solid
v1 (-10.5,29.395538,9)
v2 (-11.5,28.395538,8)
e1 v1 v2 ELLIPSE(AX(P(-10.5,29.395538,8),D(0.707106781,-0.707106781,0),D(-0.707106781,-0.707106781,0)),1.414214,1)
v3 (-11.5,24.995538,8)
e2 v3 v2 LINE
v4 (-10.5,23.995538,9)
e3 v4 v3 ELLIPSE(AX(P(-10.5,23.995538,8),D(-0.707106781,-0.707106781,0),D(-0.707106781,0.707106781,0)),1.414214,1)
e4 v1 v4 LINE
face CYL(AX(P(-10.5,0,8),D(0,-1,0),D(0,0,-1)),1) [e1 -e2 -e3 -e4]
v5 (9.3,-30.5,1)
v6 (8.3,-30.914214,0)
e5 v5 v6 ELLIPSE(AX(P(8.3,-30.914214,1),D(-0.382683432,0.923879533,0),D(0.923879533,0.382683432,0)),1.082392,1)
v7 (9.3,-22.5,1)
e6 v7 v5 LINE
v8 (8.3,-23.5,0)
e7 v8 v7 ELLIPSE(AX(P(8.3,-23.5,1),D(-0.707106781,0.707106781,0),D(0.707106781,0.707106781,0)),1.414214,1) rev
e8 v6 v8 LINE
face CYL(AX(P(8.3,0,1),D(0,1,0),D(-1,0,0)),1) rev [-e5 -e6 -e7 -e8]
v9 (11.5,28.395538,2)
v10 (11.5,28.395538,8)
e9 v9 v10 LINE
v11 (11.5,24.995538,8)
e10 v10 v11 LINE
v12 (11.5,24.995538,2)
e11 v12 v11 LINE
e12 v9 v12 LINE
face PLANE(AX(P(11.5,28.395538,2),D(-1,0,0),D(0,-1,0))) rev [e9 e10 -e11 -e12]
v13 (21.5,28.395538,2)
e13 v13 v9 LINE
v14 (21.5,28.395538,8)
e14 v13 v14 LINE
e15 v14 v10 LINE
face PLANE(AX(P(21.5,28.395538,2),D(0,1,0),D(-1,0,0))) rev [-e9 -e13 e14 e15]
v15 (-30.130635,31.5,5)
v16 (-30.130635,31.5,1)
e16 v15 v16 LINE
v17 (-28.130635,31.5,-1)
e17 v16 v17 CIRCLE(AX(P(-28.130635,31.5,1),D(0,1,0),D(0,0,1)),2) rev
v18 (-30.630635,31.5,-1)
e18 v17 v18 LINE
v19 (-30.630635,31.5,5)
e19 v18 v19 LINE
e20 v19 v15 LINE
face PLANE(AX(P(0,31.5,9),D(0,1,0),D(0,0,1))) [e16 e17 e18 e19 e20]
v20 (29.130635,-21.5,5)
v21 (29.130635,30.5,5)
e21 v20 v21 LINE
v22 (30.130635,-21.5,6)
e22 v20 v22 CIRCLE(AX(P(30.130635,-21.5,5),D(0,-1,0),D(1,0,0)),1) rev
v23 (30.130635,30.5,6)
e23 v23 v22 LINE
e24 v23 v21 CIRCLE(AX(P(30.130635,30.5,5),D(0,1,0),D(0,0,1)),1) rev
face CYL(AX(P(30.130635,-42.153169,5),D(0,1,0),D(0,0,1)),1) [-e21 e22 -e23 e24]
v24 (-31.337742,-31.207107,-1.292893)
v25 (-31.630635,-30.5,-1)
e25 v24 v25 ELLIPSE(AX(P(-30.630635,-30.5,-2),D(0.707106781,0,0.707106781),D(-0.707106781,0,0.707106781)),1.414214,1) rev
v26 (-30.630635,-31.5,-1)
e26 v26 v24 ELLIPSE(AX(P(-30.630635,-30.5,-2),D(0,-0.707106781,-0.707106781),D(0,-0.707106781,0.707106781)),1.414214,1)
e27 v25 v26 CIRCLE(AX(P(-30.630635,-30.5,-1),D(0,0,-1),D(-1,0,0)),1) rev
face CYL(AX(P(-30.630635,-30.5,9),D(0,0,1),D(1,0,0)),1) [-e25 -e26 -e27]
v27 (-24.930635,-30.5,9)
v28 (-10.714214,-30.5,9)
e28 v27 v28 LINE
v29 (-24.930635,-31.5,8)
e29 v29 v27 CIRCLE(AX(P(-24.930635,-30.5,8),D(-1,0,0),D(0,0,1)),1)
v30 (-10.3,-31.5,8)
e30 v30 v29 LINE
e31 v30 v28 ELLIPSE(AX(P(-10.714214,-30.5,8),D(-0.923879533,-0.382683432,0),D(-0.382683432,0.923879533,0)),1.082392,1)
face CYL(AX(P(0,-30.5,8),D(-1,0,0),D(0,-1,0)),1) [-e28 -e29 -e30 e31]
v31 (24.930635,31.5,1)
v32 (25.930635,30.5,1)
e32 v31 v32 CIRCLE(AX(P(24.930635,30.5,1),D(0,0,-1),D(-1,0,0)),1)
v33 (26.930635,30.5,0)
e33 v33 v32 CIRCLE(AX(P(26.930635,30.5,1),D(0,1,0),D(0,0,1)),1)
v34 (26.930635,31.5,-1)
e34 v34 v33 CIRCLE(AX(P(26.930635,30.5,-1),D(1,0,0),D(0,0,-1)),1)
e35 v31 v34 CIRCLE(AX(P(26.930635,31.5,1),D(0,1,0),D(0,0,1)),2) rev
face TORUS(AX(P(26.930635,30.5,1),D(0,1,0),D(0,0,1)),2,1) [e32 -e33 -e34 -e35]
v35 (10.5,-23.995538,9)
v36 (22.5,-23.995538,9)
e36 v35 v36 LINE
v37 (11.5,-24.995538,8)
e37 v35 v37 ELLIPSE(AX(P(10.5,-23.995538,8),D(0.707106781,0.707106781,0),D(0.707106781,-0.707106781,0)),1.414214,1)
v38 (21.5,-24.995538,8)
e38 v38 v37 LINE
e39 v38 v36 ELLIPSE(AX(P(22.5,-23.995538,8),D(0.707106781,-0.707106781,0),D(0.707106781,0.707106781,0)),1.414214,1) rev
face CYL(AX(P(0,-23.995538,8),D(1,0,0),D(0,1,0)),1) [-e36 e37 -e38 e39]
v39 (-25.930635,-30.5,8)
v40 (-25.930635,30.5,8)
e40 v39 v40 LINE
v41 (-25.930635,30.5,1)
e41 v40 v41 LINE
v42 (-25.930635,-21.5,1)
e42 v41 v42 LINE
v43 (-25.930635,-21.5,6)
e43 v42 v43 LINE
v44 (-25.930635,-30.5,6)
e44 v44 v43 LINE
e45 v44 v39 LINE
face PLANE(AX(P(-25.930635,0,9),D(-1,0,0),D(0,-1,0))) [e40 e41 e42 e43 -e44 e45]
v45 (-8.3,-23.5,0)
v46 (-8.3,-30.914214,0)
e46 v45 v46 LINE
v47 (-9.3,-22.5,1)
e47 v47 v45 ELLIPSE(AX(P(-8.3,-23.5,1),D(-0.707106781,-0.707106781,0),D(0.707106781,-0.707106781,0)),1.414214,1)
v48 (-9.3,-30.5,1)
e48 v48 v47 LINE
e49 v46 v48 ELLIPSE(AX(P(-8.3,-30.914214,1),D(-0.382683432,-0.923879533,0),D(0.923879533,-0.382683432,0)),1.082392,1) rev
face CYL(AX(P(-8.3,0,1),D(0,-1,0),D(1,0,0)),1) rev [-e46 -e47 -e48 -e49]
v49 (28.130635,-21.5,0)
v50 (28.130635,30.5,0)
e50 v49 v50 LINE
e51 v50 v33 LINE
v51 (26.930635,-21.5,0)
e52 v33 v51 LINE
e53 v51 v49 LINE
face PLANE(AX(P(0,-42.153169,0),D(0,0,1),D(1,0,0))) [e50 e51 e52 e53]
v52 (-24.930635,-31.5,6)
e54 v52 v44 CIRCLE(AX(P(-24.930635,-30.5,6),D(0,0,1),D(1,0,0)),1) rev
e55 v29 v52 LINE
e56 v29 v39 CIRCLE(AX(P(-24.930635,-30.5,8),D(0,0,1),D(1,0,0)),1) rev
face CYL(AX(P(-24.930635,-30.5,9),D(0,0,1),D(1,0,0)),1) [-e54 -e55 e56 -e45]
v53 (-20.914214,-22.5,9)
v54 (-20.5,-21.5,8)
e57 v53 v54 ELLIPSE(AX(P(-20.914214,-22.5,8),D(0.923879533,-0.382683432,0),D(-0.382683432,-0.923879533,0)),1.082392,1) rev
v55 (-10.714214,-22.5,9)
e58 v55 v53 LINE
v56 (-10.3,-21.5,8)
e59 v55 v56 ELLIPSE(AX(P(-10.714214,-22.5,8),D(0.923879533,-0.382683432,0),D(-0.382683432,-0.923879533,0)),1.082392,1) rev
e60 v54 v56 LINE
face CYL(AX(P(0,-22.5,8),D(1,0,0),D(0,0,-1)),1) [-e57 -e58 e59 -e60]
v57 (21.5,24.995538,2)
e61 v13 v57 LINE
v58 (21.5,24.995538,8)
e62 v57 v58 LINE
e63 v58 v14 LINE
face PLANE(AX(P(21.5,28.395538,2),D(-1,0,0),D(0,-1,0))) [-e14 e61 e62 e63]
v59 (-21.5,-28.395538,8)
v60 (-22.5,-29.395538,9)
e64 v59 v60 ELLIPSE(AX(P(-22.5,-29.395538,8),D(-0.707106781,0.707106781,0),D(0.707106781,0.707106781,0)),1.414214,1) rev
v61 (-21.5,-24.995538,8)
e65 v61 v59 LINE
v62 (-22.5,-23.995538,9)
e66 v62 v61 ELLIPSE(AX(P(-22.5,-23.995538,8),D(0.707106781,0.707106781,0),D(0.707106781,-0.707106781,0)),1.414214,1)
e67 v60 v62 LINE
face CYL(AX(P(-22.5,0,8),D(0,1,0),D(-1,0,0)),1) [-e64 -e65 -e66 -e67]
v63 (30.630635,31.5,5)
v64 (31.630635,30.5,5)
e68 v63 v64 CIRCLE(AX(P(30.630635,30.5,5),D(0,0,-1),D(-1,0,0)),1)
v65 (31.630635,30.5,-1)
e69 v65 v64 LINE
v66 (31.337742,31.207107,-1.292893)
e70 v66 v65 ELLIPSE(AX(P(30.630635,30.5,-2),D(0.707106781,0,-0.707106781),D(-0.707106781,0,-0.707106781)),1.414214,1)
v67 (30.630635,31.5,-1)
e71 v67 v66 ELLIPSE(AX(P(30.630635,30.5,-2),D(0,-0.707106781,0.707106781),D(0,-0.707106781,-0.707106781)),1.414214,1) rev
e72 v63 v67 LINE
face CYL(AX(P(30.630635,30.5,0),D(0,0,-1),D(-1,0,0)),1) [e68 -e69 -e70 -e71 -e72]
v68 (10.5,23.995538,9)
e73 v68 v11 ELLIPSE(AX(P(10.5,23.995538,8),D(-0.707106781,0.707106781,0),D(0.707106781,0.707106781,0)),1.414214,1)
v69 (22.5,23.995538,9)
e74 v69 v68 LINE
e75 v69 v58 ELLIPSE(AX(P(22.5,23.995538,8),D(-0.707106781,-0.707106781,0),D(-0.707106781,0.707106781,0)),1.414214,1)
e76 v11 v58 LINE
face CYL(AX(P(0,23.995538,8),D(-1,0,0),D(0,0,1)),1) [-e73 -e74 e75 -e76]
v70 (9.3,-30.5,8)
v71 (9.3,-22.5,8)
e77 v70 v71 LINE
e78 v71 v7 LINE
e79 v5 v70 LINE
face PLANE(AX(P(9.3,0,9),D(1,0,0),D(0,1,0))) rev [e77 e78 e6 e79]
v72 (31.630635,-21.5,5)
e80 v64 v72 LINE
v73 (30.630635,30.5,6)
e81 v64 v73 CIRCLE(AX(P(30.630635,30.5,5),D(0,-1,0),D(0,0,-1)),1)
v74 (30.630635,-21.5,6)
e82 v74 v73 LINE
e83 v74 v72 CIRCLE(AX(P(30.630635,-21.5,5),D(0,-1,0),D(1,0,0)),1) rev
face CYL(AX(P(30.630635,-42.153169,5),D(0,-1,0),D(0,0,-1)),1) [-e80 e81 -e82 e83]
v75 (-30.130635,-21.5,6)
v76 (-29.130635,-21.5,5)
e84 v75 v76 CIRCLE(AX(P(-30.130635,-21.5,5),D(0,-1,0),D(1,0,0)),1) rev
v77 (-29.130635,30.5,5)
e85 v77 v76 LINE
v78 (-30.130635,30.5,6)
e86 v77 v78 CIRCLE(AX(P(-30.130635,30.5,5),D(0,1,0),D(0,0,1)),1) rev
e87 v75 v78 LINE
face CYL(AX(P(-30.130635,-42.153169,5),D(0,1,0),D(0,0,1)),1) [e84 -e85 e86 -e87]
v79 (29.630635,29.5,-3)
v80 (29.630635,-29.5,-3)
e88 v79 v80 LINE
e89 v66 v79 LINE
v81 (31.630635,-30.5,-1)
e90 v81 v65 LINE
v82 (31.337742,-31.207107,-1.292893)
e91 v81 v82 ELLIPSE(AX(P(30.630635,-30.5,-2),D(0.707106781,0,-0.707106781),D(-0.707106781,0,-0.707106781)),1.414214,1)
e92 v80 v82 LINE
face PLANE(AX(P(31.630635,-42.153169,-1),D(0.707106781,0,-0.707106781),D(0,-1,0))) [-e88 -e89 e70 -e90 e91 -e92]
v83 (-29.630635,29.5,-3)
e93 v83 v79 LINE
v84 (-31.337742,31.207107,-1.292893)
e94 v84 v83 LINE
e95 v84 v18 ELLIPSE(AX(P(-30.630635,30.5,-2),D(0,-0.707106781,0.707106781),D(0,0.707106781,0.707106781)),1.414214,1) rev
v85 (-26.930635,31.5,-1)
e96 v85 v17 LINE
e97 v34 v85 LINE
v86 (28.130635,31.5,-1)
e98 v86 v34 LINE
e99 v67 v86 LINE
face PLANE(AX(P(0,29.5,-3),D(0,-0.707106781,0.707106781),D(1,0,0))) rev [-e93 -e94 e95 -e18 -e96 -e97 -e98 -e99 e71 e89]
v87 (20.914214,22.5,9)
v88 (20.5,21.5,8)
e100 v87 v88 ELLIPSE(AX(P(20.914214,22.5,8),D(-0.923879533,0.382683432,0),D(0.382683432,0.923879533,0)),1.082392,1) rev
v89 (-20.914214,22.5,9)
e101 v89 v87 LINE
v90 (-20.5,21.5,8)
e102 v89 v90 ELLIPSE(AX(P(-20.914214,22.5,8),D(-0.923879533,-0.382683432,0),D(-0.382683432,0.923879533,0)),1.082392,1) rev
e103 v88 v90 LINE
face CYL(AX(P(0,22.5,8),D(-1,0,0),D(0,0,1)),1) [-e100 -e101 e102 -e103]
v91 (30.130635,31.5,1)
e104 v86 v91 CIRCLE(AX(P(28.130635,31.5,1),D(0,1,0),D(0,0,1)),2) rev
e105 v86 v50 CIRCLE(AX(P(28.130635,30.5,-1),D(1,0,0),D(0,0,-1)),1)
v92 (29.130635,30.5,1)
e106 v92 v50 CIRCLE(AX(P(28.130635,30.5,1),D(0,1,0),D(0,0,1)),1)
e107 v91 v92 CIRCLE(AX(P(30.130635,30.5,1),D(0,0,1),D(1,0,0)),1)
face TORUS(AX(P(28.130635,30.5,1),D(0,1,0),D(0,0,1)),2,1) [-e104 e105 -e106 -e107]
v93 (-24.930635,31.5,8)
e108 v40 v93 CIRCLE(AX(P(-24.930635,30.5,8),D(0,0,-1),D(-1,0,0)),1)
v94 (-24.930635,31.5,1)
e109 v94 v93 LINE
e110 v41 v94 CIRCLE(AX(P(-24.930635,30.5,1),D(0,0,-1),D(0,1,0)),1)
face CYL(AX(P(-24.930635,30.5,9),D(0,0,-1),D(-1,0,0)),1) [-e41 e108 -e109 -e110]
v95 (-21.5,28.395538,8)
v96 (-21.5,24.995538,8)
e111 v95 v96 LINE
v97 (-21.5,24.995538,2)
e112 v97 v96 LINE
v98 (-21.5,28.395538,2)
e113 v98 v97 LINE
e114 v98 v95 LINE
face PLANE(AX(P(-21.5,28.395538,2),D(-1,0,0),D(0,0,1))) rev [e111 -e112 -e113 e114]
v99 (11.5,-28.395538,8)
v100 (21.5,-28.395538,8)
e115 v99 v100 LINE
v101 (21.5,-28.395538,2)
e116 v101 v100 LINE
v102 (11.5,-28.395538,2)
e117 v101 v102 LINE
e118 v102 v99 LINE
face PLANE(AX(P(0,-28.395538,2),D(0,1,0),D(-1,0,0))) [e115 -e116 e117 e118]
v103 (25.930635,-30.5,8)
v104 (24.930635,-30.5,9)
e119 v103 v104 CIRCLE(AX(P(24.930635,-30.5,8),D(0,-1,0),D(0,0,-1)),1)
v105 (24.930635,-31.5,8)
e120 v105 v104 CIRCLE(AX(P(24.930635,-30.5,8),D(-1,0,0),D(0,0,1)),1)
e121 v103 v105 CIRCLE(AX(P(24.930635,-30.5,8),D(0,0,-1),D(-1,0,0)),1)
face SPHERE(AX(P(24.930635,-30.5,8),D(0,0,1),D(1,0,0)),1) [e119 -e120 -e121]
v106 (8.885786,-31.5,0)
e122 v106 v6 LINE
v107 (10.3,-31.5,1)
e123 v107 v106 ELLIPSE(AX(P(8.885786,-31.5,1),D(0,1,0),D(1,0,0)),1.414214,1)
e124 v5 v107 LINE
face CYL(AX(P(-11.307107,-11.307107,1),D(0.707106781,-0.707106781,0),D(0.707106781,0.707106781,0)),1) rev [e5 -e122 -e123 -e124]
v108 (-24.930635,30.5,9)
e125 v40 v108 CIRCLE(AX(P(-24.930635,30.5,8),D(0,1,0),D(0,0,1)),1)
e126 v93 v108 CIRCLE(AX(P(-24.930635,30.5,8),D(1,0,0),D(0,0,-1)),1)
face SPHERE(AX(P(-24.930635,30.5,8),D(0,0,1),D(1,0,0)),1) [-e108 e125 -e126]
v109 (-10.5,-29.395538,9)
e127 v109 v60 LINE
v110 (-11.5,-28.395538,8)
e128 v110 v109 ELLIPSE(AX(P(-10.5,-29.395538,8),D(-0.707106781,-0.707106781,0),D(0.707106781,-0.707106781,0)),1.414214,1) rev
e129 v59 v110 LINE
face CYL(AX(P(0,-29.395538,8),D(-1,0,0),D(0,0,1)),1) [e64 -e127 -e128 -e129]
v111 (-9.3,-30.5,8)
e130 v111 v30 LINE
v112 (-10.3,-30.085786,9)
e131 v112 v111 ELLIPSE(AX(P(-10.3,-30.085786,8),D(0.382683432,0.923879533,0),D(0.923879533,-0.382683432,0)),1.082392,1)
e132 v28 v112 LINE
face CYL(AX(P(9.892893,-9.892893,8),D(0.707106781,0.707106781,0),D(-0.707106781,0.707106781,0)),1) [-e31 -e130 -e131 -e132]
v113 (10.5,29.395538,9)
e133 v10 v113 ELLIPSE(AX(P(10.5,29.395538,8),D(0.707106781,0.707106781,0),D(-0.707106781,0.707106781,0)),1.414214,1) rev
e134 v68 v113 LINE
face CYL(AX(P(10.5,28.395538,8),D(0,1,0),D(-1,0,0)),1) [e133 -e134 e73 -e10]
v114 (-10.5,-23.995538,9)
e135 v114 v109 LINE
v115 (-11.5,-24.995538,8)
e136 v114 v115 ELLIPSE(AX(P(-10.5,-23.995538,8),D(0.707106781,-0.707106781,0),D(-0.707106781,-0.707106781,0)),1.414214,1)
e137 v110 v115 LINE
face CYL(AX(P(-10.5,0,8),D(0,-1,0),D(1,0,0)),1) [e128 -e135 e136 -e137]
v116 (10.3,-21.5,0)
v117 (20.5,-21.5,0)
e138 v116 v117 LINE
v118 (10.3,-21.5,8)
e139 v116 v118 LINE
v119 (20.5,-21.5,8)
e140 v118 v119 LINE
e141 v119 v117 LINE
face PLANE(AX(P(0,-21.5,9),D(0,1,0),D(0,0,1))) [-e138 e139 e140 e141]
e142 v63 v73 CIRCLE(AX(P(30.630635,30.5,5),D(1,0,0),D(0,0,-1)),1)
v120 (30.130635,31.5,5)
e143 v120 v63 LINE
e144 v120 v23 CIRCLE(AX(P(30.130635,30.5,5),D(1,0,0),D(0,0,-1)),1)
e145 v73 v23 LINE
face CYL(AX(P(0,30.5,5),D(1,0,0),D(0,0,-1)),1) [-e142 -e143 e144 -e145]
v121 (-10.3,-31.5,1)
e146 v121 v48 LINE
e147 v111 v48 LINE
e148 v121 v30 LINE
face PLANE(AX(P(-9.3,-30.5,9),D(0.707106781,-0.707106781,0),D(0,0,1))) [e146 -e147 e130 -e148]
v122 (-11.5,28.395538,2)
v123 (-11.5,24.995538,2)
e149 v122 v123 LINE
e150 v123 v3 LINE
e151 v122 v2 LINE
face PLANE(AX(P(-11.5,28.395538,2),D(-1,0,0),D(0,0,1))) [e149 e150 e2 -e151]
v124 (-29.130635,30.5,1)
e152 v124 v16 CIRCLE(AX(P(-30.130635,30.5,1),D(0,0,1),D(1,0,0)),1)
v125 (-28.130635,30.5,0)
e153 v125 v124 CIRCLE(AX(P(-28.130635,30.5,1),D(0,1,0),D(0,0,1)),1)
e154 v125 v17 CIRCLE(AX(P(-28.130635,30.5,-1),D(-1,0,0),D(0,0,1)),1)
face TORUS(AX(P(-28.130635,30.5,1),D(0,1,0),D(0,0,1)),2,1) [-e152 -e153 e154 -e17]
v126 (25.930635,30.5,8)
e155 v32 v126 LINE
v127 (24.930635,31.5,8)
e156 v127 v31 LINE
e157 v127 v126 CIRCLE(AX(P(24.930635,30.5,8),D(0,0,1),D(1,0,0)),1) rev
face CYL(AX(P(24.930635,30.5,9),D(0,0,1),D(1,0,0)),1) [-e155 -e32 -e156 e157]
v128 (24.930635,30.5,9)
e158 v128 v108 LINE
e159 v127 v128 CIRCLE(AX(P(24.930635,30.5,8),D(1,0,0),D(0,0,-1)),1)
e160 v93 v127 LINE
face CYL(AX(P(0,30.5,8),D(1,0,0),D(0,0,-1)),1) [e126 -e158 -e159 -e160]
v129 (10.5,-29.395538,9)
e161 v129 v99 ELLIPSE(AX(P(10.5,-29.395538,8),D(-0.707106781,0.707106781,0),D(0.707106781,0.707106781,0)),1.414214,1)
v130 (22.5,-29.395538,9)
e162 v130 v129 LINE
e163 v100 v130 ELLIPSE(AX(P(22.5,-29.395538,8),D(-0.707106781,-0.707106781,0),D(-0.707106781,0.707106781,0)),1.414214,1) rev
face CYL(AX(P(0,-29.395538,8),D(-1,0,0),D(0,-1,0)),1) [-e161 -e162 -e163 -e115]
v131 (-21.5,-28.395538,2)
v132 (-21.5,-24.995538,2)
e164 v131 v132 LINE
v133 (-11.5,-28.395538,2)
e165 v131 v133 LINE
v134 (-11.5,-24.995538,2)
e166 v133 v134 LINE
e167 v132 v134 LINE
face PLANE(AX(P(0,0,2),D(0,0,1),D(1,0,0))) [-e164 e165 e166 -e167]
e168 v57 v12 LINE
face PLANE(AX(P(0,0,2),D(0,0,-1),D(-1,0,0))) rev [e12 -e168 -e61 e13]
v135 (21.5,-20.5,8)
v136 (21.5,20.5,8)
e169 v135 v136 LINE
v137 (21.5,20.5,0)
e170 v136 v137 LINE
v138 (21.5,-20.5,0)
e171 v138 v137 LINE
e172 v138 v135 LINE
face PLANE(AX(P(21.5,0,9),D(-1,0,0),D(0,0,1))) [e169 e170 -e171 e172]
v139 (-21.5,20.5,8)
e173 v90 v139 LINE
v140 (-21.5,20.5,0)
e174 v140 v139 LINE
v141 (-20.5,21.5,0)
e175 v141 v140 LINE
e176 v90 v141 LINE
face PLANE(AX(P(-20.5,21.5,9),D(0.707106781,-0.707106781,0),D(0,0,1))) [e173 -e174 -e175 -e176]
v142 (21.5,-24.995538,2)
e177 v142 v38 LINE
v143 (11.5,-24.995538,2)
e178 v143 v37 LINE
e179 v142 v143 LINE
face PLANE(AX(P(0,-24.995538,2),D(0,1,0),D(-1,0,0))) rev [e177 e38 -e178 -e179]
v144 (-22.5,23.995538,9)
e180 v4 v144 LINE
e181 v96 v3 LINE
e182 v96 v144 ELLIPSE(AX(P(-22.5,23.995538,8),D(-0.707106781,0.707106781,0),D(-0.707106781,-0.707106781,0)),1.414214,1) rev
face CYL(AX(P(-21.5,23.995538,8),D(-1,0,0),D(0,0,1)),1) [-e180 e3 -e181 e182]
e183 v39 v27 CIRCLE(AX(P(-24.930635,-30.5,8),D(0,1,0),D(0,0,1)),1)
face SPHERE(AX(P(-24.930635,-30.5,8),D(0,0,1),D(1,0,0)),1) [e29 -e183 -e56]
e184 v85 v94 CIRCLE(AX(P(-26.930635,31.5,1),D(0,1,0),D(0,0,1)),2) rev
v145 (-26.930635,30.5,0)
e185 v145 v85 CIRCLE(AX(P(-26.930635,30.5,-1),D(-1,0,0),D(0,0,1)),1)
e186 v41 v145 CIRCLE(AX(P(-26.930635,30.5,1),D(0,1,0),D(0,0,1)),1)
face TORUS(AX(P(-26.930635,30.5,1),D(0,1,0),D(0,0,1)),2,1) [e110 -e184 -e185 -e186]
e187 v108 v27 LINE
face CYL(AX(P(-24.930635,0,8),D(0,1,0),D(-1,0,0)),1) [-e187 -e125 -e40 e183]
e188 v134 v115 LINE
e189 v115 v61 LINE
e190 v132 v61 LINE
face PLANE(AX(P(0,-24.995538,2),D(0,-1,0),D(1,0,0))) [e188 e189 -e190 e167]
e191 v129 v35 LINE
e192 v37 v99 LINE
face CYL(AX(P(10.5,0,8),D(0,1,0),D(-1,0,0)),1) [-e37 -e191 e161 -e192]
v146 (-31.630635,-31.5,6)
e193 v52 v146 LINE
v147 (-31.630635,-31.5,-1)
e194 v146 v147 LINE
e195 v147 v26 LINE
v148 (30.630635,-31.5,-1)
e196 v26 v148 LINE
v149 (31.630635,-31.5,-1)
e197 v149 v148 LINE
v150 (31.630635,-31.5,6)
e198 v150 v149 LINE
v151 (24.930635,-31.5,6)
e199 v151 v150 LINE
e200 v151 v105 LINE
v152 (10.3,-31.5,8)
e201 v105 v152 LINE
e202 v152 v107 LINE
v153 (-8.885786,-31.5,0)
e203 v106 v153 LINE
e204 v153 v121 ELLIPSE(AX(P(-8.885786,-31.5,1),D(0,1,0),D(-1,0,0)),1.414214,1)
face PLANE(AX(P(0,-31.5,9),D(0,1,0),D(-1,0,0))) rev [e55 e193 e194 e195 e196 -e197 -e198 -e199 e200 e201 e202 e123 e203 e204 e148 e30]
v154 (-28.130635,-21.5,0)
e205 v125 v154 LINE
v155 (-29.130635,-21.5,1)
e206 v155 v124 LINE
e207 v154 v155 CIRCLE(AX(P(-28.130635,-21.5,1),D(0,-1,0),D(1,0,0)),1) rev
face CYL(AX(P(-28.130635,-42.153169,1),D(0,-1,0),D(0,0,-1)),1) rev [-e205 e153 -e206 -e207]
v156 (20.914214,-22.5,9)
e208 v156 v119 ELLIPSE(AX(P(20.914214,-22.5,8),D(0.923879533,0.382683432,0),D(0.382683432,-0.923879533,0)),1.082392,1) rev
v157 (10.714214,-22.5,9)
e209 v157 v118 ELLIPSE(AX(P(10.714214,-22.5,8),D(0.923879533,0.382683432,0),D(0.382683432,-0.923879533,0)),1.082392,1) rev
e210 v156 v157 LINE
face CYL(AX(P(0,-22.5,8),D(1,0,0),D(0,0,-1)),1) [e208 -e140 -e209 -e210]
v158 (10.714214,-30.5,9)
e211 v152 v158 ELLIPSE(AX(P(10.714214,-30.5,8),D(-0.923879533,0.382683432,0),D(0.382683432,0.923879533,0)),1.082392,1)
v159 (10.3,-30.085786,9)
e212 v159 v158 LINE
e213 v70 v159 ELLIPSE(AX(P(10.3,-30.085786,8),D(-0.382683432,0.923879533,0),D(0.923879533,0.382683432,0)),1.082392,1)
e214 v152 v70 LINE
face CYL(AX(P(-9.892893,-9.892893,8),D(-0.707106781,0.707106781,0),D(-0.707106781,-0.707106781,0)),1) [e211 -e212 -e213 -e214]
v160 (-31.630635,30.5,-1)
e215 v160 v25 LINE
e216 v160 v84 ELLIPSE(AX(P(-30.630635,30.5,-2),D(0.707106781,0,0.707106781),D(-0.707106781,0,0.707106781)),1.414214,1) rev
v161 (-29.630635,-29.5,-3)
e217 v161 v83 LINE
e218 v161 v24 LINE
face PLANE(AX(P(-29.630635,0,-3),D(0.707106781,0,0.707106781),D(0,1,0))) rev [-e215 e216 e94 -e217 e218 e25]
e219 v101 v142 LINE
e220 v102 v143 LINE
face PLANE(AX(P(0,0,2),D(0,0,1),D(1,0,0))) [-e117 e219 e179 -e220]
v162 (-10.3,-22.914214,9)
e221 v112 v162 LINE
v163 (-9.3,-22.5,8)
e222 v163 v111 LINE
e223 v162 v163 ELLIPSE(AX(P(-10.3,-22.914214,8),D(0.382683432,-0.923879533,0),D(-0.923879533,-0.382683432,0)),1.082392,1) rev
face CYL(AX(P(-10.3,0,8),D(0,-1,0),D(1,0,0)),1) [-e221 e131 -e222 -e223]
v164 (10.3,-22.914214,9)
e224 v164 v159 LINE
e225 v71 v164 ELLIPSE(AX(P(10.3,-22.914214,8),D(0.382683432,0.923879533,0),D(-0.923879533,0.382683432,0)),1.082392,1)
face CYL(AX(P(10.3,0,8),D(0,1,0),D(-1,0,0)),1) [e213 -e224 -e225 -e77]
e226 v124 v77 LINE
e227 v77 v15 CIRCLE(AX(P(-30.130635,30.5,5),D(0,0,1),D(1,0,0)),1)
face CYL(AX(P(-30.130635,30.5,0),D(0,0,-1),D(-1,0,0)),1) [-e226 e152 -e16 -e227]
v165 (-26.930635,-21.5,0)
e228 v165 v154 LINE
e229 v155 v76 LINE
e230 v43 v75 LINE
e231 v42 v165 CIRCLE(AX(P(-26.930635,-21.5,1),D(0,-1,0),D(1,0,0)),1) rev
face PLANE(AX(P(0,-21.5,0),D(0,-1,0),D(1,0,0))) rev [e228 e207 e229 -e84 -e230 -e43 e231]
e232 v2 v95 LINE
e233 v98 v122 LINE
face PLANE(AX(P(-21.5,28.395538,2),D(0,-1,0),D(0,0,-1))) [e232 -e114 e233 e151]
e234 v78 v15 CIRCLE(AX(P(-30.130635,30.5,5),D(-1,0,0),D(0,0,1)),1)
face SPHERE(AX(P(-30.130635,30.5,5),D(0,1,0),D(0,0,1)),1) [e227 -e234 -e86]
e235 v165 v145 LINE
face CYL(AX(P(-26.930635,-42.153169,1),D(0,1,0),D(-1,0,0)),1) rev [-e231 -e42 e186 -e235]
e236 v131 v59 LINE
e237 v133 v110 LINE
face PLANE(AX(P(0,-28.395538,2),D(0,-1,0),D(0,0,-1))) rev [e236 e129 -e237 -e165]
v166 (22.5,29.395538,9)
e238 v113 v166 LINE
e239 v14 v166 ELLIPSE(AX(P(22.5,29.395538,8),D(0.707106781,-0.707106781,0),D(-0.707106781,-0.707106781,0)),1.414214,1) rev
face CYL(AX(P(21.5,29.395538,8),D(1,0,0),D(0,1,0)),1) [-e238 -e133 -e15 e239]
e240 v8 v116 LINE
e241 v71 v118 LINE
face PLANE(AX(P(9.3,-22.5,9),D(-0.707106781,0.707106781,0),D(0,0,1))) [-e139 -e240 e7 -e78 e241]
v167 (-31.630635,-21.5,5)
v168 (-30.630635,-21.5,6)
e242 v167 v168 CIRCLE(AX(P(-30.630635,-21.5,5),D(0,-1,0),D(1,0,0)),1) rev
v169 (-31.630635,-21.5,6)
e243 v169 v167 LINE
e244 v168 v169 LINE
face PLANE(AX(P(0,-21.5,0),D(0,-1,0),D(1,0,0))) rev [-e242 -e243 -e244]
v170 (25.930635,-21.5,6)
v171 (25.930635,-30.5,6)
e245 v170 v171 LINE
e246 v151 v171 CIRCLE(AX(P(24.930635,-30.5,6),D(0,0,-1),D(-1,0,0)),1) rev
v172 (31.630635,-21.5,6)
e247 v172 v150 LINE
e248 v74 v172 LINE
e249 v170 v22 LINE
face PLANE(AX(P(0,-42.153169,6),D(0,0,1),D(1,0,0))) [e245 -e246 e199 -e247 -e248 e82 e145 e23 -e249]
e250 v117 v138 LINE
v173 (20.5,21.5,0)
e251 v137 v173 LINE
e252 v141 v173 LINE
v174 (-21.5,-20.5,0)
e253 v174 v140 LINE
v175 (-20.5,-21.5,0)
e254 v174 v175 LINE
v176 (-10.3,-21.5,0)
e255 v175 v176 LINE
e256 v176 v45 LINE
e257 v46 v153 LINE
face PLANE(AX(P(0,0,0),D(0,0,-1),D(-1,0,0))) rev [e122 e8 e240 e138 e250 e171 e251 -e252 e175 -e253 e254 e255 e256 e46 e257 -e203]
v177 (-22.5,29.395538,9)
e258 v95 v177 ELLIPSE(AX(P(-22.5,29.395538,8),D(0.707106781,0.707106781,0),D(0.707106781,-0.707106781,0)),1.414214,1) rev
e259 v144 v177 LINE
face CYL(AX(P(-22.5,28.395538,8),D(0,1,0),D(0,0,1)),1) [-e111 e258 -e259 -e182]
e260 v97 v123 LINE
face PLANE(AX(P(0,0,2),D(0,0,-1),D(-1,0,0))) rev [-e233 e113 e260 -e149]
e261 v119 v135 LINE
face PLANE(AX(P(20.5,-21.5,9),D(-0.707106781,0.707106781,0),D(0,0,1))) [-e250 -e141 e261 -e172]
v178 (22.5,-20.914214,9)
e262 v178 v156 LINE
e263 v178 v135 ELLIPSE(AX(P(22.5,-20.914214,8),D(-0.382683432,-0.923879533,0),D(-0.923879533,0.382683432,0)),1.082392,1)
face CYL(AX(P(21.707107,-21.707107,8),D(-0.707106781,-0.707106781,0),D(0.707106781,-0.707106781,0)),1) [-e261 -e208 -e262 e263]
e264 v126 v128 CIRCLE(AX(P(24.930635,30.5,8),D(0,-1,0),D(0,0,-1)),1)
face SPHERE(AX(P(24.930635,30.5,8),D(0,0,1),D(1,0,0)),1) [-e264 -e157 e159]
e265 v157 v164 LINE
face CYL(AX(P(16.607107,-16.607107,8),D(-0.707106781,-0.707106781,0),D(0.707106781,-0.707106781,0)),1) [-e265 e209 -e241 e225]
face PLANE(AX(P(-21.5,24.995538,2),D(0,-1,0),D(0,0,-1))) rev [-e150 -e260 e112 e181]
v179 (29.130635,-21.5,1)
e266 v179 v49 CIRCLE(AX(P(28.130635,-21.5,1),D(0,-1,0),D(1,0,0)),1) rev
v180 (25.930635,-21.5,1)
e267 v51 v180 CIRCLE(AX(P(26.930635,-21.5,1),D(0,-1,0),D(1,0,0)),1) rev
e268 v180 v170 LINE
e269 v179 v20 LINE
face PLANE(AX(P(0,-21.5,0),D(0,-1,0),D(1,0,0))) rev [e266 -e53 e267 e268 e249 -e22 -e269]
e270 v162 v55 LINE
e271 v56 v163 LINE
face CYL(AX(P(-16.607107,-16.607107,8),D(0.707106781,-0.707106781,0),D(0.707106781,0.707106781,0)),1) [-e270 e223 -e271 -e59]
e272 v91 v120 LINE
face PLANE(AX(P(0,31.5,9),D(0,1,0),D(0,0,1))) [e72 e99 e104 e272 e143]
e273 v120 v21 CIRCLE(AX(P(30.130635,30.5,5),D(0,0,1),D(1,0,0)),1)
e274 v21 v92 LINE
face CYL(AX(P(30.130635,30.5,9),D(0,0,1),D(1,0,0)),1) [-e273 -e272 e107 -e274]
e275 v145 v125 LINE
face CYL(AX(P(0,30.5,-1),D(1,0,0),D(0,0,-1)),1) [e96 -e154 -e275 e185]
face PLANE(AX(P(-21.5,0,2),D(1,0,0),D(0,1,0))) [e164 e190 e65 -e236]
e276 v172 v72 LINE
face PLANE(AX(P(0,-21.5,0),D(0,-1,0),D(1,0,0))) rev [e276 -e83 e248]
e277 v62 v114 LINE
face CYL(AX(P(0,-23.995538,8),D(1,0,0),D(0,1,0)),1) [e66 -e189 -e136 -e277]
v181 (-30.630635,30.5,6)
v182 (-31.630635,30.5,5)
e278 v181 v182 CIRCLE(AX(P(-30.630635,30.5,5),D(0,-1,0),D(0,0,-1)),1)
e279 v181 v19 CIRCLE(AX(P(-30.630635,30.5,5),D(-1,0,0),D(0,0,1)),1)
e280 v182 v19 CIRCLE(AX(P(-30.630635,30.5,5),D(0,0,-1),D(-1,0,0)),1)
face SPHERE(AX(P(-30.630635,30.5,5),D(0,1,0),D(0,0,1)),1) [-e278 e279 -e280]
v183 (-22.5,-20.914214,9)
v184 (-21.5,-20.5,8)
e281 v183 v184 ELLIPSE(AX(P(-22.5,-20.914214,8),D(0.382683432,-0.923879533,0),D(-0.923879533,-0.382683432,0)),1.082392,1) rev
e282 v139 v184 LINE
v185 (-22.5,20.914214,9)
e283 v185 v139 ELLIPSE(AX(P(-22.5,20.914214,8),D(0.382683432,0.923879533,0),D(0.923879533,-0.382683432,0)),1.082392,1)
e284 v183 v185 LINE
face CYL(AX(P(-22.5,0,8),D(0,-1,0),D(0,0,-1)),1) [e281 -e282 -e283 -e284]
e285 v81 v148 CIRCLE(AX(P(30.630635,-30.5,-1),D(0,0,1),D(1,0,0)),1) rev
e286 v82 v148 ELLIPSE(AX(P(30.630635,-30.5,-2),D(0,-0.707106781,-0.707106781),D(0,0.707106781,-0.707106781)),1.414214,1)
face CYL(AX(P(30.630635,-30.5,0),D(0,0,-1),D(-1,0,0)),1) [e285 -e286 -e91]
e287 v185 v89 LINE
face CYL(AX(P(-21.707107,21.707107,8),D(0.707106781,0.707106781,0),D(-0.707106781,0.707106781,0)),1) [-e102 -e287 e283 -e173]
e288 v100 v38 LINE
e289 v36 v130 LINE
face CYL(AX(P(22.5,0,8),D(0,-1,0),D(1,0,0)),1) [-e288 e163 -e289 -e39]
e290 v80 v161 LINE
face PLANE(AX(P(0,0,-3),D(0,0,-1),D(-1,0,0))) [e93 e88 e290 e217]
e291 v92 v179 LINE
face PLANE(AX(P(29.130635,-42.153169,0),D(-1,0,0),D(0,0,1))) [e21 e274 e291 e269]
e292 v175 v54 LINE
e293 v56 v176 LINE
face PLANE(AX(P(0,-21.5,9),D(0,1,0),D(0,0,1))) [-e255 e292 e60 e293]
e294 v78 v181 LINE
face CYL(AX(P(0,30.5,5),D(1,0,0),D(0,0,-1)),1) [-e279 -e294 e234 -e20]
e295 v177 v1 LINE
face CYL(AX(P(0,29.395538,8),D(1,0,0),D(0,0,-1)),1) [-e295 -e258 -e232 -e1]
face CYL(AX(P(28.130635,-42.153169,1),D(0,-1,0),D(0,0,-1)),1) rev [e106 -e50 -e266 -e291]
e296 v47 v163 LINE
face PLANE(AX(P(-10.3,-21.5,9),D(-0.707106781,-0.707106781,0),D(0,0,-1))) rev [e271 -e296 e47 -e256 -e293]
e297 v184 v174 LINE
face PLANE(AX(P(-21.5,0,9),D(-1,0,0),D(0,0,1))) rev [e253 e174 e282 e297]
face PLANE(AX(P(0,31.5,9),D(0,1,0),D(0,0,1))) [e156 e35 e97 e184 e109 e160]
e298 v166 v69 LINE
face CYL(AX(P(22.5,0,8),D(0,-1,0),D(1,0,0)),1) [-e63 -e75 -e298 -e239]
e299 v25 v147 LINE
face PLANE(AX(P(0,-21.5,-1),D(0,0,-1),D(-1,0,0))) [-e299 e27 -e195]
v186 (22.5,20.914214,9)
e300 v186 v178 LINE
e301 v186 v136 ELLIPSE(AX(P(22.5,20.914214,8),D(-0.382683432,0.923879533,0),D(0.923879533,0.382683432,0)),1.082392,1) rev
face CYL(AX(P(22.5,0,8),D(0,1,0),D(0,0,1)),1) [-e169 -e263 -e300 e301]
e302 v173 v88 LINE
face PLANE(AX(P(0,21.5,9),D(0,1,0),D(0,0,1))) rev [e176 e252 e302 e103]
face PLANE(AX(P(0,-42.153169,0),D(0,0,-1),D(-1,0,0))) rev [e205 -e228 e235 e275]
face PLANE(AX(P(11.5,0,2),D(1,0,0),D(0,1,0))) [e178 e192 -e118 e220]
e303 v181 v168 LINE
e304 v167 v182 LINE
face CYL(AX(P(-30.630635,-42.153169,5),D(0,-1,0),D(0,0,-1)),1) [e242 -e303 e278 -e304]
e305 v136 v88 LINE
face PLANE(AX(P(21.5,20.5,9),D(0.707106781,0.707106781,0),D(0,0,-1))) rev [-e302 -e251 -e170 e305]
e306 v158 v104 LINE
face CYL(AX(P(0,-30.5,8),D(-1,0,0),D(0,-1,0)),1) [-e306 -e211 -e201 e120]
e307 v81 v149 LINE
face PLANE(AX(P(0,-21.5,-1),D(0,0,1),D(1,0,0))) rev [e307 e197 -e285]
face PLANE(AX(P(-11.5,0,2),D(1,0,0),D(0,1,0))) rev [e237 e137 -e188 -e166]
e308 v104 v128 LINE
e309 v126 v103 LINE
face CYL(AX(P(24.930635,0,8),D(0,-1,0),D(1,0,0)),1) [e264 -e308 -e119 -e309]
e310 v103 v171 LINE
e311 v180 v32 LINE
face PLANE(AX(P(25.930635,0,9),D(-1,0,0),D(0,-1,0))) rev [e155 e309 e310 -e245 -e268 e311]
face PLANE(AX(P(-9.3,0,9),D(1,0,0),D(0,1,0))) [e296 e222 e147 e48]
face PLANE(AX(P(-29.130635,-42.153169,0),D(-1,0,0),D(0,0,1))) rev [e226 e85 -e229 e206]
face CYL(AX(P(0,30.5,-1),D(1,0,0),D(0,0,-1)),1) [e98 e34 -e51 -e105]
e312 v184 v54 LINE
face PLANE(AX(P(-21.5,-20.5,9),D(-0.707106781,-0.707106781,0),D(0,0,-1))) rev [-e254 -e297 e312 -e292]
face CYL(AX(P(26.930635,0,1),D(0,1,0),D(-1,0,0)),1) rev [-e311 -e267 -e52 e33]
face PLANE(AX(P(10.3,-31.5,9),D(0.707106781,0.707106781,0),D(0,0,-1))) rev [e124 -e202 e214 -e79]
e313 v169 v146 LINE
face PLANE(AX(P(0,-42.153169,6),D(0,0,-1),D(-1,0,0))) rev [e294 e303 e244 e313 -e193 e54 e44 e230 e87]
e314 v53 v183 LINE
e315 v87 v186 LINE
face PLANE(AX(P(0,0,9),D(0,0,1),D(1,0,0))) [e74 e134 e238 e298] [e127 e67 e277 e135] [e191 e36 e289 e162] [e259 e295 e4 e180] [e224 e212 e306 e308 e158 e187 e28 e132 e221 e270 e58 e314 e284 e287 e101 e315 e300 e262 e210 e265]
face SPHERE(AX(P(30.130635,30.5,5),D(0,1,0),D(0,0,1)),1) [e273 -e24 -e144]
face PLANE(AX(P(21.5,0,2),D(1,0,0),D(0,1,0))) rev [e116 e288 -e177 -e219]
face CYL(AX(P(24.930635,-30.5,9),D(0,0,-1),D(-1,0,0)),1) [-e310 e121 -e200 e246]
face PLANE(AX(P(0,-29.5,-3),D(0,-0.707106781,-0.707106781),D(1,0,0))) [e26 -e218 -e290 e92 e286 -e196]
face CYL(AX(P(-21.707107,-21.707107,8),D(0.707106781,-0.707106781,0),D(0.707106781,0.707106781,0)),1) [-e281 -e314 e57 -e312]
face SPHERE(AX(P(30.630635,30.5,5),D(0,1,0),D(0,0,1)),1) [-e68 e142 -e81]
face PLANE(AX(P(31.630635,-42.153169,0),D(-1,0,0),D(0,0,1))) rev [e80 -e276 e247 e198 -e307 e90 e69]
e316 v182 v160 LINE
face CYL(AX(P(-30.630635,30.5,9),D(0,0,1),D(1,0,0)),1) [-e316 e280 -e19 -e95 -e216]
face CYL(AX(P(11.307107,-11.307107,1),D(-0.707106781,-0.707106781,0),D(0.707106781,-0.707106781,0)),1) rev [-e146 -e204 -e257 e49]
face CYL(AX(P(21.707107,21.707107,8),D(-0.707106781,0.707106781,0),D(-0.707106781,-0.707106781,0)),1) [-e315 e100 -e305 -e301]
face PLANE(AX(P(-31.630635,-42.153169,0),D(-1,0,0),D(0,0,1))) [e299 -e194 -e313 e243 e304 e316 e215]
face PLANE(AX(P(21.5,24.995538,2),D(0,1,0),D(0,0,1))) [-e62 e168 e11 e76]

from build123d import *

# Parameters (mm, degrees)
BOSS_EXTRU_2_DEPTH      = 9
ESQUISSE3_W             = 51.8612703
ESQUISSE3_H             = 63
BOSS_EXTRU_3_DEPTH      = 3
ESQUISSE4_W             = 10
ESQUISSE4_H             = 3.4
ENL_V_MAT_EXTRU_1_DEPTH = 7
ESQUISSE5_W             = 3.2
ESQUISSE5_H             = 3
BOSS_EXTRU_4_DEPTH      = 63
CHANFREIN1_SIZE         = 1
CHANFREIN2_SIZE         = 2
CONG_1_R                = 1
CONG_2_R                = 1
CHANFREIN4_SIZE         = 1
CONG_4_R                = 1
CONG_5_R                = 1
ESQUISSE6_W             = 6.7
ESQUISSE6_H             = 1
BOSS_EXTRU_5_DEPTH      = 10


with BuildPart() as part:
    # Esquisse2 → Boss.-Extru.2 (new body)
    with BuildSketch(Plane.XY):
        Polygon((-9.3, -31.5), (-9.3, -21.5), (-21.5, -21.5), (-21.5, 21.5), (21.5, 21.5), (21.5, -21.5), (9.3, -21.5), (9.3, -31.5), (25.93063515, -31.5), (25.93063515, 31.5), (-25.93063515, 31.5), (-25.93063515, -31.5), align=None)
    extrude(amount=BOSS_EXTRU_2_DEPTH)

    # Esquisse3 → Boss.-Extru.3 (add)
    with BuildSketch(Plane(origin=(0, 0, 0), x_dir=(-1, 0, 0), z_dir=(0, 0, -1))):
        Rectangle(ESQUISSE3_W, ESQUISSE3_H)
    extrude(amount=BOSS_EXTRU_3_DEPTH)

    # Esquisse4 → Enlèv. mat.-Extru.1 (cut)
    with BuildSketch(Plane.XY.offset(9)):
        with Locations((-16.5, -26.695538472)):
            Rectangle(ESQUISSE4_W, ESQUISSE4_H)
        with Locations((16.5, -26.695538472)):
            Rectangle(ESQUISSE4_W, ESQUISSE4_H)
        with Locations((16.5, 26.695538472)):
            Rectangle(ESQUISSE4_W, ESQUISSE4_H)
        with Locations((-16.5, 26.695538472)):
            Rectangle(ESQUISSE4_W, ESQUISSE4_H)
    extrude(amount=-ENL_V_MAT_EXTRU_1_DEPTH, mode=Mode.SUBTRACT)

    # Esquisse5 → Boss.-Extru.4 (add)
    with BuildSketch(Plane(origin=(0, 31.5, 0), x_dir=(1, 0, 0), z_dir=(0, 1, 0))):
        Polygon((-29.13063515, 0), (-29.13063515, 3), (-31.63063515, 3), (-31.63063515, -6), (-29.13063515, -6), align=None)
        with Locations((-27.53063515, 1.5)):
            Rectangle(ESQUISSE5_W, ESQUISSE5_H)
        with Locations((27.53063515, 1.5)):
            Rectangle(ESQUISSE5_W, ESQUISSE5_H)
        Polygon((29.13063515, 3), (29.13063515, 0), (29.13063515, -6), (31.63063515, -6), (31.63063515, 3), align=None)
    extrude(amount=-BOSS_EXTRU_4_DEPTH)

    # Chanfrein1
    chanfrein1_edges = [part.edges().sort_by_distance(p)[0] for p in [
        (21.5, -21.5, 4.5),
        (21.5, 21.5, 4.5),
        (-21.5, 21.5, 4.5),
        (-21.5, -21.5, 4.5),
    ]]
    chamfer(chanfrein1_edges, length=CHANFREIN1_SIZE)

    # Chanfrein2
    chanfrein2_edges = [part.edges().sort_by_distance(p)[0] for p in [
        (-31.63063515, 0, -3),
        (31.63063515, 0, -3),
        (0, -31.5, -3),
        (0, 31.5, -3),
    ]]
    chamfer(chanfrein2_edges, length=CHANFREIN2_SIZE)

    # Congé1
    cong_1_edges = [part.edges().sort_by_distance(p)[0] for p in [
        (-25.93063515, 0, 0),
        (-29.13063515, 0, 0),
        (-29.13063515, 0, 6),
        (-31.63063515, 0, 6),
        (25.93063515, 0, 0),
        (29.13063515, 0, 0),
        (29.13063515, 0, 6),
        (31.63063515, 0, 6),
    ]]
    fillet(cong_1_edges, radius=CONG_1_R)

    # Congé2
    cong_2_edges = [part.edges().sort_by_distance(p)[0] for p in [
        (-31.63063515, 31.5, 2),
        (31.63063515, 31.5, 2),
        (30.38063515, -31.5, 6),
        (30.38063515, 31.5, 6),
        (-30.38063515, 31.5, 6),
        (-29.13063515, 31.5, 3),
        (-27.53063515, 31.5, 0),
        (27.53063515, 31.5, 0),
        (29.13063515, 31.5, 3),
        (-31.337741931, 31.5, 5.707106781),
        (-29.423528369, 31.5, 5.707106781),
        (29.423528369, 31.5, 5.707106781),
        (31.337741931, 31.5, 5.707106781),
        (31.63063515, -31.5, 2),
        (-31.63063515, -31.5, 2),
        (29.13063515, -31.5, 3),
        (27.53063515, -31.5, 0),
        (-27.53063515, -31.5, 0),
        (-29.13063515, -31.5, 3),
        (-30.38063515, -31.5, 6),
        (-31.337741931, -31.5, 5.707106781),
        (-29.423528369, -31.5, 5.707106781),
        (29.423528369, -31.5, 5.707106781),
        (31.337741931, -31.5, 5.707106781),
        (28.837741931, 31.5, 0.292893219),
        (28.837741931, -31.5, 0.292893219),
        (26.223528369, 31.5, 0.292893219),
        (26.223528369, -31.5, 0.292893219),
        (-28.837741931, 31.5, 0.292893219),
        (-28.837741931, -31.5, 0.292893219),
        (-26.223528369, 31.5, 0.292893219),
        (-26.223528369, -31.5, 0.292893219),
        (-25.93063515, -31.5, 5),
        (-25.93063515, 31.5, 5),
        (25.93063515, 31.5, 5),
        (25.93063515, -31.5, 5),
    ]]
    fillet(cong_2_edges, radius=CONG_2_R - 0.0001)  # a hair under: the kernel refuses the full size

    # Chanfrein4
    chanfrein4_edges = [part.edges().sort_by_distance(p)[0] for p in [
        (-9.3, -31.5, 4.5),
        (9.3, -31.5, 4.5),
        (9.3, -21.5, 4.5),
        (-9.3, -21.5, 4.5),
    ]]
    chamfer(chanfrein4_edges, length=CHANFREIN4_SIZE)

    # Congé4
    cong_4_edges = [part.edges().sort_by_distance(p)[0] for p in [
        (-21.5, 0, 9),
        (-15.4, -21.5, 9),
        (21.5, 0, 9),
        (0, 21.5, 9),
        (-21, -21, 9),
        (21, -21, 9),
        (21, 21, 9),
        (-21, 21, 9),
        (0, 31.5, 9),
        (-17.615367575, -31.5, 9),
        (-25.93063515, 0, 9),
        (25.93063515, 0, 9),
        (25.63777122, 31.207136071, 9),
        (25.63777122, -31.207136071, 9),
        (-25.63777122, -31.207136071, 9),
        (-25.63777122, 31.207136071, 9),
        (17.615367575, -31.5, 9),
        (9.3, -26.5, 9),
        (-9.3, -26.5, 9),
        (15.4, -21.5, 9),
        (-9.8, -22, 9),
        (9.8, -22, 9),
        (-9.8, -31, 9),
        (9.8, -31, 9),
        (-16.5, 28.395538472, 9),
        (-11.5, 26.695538472, 9),
        (-21.5, 26.695538472, 9),
        (-16.5, 24.995538472, 9),
        (21.5, 26.695538472, 9),
        (16.5, 24.995538472, 9),
        (16.5, 28.395538472, 9),
        (11.5, 26.695538472, 9),
        (16.5, -28.395538472, 9),
        (11.5, -26.695538472, 9),
        (21.5, -26.695538472, 9),
        (16.5, -24.995538472, 9),
        (-21.5, -26.695538472, 9),
        (-16.5, -24.995538472, 9),
        (-16.5, -28.395538472, 9),
        (-11.5, -26.695538472, 9),
    ]]
    fillet(cong_4_edges, radius=CONG_4_R - 0.0001)  # a hair under: the kernel refuses the full size

    # Congé5
    cong_5_edges = [part.edges().sort_by_distance(p)[0] for p in [
        (9.3, -26.5, 0),
        (-9.3, -26.5, 0),
        (9.8, -31, 0),
        (-9.8, -31, 0),
    ]]
    fillet(cong_5_edges, radius=CONG_5_R)

    # Esquisse6 → Boss.-Extru.5 (add)
    with BuildSketch(Plane.XZ.offset(31.5)):
        with BuildLine():
            Line((-24.93063515, 1), (-24.93063515, 5))
            Line((-24.93063515, 5), (-31.63063515, 5))
            Line((-31.63063515, 5), (-31.63063515, -1))
            Line((-31.63063515, -1), (-26.93063515, -1))
            ThreePointArc((-26.93063515, -1), (-25.516421587, -0.414213562), (-24.93063515, 1))
        make_face()
        with Locations((-28.28063515, 5.5)):
            Rectangle(ESQUISSE6_W, ESQUISSE6_H)
        with BuildLine():
            Line((31.63063515, -1), (31.63063515, 5))
            Line((31.63063515, 5), (24.93063515, 5))
            Line((24.93063515, 5), (24.93063515, 1))
            ThreePointArc((24.93063515, 1), (25.516421587, -0.414213562), (26.93063515, -1))
            Line((26.93063515, -1), (31.63063515, -1))
        make_face()
        with Locations((28.28063515, 5.5)):
            Rectangle(ESQUISSE6_W, ESQUISSE6_H)
    extrude(amount=-BOSS_EXTRU_5_DEPTH)


solid = part.part
